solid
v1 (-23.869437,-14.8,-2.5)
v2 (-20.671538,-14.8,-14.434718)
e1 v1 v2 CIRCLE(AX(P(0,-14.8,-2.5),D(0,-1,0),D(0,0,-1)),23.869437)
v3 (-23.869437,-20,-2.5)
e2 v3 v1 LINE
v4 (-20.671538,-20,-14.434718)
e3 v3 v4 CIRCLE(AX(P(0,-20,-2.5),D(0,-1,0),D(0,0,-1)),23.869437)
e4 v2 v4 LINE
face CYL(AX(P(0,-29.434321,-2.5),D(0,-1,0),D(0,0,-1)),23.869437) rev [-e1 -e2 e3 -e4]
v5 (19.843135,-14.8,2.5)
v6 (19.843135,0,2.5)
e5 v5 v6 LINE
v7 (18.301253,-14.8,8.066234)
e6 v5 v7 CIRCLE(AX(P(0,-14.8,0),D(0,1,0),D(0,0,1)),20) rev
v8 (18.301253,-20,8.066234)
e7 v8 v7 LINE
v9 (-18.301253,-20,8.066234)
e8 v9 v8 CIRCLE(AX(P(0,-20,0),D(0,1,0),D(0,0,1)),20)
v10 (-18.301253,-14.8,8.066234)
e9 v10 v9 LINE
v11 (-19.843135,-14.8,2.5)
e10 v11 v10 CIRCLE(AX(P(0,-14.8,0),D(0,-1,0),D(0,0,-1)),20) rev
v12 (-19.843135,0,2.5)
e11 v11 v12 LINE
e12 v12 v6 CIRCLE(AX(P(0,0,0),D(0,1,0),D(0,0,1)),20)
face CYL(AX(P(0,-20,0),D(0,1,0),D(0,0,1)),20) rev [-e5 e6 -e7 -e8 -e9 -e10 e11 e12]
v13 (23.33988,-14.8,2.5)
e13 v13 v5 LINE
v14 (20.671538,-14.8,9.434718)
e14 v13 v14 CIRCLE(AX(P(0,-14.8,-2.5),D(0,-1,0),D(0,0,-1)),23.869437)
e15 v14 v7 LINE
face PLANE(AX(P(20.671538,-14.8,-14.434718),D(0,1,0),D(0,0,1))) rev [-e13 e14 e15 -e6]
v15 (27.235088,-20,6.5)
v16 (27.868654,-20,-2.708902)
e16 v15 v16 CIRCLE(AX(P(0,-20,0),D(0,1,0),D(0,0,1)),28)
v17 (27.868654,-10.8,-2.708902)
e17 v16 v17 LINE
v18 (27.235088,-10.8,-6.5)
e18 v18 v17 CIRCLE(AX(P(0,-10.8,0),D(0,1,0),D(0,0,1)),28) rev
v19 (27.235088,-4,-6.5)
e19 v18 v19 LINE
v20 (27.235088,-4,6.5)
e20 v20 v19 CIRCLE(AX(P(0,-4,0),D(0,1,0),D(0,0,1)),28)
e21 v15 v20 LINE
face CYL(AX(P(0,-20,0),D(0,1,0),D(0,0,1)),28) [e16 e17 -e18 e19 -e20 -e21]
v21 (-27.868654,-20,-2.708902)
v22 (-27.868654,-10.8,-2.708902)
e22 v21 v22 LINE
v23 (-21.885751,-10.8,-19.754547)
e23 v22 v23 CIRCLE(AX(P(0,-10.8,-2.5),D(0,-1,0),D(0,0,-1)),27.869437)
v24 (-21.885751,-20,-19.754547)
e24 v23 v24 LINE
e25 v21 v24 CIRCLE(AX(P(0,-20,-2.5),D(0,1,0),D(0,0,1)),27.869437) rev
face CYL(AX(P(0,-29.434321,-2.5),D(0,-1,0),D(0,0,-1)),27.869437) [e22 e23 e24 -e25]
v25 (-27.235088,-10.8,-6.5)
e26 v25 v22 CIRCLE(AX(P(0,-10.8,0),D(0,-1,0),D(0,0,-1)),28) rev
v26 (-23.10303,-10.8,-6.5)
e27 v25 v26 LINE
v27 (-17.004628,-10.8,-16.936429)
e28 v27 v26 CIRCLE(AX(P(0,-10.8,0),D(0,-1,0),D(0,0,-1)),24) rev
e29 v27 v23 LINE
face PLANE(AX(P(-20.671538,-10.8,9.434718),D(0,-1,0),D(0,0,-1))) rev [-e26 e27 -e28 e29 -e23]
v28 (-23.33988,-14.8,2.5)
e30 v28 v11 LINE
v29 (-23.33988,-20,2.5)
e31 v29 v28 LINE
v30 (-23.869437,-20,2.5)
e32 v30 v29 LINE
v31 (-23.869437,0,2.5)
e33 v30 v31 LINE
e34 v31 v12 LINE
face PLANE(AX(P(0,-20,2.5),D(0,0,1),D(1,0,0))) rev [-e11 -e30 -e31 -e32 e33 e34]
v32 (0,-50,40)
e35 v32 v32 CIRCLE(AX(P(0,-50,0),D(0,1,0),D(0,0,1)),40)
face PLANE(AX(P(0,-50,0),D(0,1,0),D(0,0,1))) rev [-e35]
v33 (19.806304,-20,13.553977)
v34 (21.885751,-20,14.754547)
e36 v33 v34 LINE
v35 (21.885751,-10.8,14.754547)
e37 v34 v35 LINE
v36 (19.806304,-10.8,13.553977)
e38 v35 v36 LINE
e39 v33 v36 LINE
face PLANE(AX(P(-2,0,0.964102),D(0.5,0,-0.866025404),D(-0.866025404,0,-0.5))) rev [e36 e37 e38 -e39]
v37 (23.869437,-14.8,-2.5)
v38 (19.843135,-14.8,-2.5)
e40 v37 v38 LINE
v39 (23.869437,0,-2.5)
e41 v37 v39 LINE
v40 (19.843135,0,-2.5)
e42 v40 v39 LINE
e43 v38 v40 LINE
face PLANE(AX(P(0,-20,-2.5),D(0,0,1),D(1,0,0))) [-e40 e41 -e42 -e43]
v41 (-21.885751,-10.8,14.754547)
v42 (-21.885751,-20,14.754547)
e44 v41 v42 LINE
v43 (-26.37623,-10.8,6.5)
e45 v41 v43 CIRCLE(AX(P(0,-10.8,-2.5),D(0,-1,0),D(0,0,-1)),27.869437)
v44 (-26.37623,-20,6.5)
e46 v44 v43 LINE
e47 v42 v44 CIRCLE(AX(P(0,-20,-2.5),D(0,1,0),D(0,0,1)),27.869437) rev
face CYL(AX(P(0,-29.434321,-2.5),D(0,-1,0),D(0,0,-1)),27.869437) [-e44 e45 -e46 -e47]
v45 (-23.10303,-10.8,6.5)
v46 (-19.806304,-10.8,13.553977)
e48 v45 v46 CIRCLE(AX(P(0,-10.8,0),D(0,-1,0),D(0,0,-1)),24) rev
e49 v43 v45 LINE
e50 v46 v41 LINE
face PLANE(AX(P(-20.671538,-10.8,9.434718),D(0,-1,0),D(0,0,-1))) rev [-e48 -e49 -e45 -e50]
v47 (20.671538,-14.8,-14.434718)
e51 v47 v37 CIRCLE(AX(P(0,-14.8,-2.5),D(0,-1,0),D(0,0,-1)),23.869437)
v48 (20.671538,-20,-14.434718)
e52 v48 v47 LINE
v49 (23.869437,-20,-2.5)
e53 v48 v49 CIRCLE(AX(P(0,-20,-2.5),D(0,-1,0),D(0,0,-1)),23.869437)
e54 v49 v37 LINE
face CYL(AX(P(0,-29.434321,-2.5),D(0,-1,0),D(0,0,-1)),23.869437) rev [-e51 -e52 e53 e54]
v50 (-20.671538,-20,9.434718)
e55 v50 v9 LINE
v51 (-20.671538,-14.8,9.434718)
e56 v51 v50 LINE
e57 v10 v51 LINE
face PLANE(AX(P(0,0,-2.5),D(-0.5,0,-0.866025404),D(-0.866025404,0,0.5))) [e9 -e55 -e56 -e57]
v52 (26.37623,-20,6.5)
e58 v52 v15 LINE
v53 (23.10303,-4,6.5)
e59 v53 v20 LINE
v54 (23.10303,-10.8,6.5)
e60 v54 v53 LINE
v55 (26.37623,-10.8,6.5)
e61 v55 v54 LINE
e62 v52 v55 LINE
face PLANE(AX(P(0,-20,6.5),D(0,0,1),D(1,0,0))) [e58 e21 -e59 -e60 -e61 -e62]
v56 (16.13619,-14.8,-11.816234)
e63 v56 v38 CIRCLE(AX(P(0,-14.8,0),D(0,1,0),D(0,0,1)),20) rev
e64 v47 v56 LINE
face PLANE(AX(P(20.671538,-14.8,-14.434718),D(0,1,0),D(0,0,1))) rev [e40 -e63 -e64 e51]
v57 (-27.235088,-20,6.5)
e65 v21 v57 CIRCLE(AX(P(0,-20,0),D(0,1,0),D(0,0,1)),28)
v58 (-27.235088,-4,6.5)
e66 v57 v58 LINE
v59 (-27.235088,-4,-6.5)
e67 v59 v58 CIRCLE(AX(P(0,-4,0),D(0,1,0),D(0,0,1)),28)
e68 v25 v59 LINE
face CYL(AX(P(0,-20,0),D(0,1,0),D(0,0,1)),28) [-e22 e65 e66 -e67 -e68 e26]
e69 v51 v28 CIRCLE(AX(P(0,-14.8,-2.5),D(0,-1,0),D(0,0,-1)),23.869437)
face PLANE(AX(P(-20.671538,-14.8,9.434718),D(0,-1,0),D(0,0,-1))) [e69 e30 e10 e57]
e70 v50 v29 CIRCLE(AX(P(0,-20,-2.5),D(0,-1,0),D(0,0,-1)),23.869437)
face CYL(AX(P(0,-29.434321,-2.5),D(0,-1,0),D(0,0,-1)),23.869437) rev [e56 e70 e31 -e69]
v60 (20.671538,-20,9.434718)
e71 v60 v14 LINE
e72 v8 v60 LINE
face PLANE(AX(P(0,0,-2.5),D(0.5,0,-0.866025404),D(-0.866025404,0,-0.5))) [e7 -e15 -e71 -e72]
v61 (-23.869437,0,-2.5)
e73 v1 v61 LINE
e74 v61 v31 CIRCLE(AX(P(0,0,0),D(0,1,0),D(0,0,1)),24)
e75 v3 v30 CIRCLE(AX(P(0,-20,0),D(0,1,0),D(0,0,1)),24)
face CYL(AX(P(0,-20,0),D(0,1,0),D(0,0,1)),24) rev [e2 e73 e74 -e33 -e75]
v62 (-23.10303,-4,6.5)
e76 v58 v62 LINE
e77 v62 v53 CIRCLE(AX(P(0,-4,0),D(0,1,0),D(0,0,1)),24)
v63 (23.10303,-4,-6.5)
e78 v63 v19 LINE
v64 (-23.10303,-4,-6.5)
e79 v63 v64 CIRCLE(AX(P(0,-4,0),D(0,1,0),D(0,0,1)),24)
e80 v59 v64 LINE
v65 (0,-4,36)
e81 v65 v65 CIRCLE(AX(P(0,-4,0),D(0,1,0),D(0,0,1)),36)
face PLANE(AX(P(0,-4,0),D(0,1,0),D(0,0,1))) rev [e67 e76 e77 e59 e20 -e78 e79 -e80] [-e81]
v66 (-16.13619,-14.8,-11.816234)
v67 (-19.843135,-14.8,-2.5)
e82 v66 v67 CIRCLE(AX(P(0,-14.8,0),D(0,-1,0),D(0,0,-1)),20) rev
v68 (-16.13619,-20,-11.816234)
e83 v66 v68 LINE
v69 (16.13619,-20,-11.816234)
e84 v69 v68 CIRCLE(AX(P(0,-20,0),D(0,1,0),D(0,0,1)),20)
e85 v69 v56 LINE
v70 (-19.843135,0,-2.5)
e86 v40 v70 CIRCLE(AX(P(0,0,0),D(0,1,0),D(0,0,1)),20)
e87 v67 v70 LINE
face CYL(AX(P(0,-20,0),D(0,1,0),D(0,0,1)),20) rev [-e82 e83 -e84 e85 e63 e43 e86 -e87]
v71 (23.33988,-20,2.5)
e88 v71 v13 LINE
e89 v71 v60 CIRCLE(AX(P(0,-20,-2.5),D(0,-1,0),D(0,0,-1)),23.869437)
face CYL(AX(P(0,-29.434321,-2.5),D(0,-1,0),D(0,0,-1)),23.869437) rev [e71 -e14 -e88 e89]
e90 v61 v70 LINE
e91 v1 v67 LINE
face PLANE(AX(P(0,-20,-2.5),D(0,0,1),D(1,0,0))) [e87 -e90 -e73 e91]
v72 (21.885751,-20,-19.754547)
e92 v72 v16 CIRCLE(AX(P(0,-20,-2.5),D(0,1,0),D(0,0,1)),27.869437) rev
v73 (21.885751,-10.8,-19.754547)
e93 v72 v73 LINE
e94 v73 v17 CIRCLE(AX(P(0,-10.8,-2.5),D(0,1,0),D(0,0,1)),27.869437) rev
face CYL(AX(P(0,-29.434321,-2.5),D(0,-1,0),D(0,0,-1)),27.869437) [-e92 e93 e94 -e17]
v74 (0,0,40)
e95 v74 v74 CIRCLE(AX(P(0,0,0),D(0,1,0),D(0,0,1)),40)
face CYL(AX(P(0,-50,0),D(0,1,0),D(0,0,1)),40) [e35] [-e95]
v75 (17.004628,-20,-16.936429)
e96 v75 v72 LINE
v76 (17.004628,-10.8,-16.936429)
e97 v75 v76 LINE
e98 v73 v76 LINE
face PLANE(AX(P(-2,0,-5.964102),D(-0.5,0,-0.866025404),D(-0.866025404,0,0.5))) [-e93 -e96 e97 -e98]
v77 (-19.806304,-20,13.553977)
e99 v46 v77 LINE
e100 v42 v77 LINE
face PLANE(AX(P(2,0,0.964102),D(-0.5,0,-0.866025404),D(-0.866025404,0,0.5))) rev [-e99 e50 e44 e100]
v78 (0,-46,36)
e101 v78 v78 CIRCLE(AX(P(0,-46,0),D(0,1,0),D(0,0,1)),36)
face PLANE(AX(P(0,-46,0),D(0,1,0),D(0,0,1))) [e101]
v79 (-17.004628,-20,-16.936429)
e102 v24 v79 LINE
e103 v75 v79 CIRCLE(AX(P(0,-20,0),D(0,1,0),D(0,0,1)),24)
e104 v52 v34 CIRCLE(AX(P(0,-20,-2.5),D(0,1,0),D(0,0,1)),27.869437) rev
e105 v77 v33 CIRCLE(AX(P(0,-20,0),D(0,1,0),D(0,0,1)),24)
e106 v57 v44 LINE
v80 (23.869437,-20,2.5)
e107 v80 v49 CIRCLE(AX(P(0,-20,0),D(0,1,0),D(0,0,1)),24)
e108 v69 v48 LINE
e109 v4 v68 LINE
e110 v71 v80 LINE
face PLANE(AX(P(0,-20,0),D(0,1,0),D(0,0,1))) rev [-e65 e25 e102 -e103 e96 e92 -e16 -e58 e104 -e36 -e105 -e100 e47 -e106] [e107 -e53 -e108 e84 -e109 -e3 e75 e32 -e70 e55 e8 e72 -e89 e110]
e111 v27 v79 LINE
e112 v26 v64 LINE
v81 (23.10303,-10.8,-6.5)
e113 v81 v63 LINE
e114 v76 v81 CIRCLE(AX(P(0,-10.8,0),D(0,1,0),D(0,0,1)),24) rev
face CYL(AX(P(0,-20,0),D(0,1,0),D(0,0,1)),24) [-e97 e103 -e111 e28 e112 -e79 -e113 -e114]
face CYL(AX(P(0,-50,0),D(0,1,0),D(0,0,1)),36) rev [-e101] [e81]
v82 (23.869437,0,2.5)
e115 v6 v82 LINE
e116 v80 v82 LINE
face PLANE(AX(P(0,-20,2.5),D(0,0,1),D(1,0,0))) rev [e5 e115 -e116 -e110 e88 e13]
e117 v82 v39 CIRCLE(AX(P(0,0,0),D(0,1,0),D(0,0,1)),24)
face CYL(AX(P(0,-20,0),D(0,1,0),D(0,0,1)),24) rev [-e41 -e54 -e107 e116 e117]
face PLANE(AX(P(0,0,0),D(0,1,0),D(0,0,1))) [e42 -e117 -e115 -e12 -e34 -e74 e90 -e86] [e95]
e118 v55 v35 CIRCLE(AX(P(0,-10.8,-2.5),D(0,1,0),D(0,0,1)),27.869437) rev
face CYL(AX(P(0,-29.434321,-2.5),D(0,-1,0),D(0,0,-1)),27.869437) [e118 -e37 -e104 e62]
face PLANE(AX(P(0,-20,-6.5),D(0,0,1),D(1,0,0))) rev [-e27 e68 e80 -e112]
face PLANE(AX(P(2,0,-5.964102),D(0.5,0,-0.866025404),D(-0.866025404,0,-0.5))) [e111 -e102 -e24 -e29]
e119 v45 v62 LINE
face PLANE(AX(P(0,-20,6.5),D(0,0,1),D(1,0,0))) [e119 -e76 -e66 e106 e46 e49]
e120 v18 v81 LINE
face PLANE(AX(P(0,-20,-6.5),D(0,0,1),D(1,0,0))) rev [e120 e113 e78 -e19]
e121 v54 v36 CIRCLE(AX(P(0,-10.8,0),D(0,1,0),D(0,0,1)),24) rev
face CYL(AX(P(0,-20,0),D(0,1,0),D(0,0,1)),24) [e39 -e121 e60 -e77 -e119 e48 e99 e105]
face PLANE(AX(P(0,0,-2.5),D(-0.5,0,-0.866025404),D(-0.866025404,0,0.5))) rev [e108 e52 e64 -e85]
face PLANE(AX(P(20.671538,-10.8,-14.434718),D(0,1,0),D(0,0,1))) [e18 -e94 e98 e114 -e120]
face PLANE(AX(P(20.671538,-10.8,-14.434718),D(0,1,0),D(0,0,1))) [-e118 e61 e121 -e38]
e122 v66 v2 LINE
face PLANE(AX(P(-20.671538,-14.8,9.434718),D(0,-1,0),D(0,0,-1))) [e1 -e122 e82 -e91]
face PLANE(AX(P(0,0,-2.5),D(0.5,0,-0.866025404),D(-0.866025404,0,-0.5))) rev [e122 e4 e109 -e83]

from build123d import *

# Parameters (mm, degrees)
SKETCH1_R                    = 40
BOSS_EXTRUDE1_DEPTH          = 50
CUT_EXTRUDE1_DEPTH           = 20
SKETCH2_W                    = 5.5
SKETCH2_H                    = 5.2
CUT_REVOLVE1_ANGLE           = 30
CUT_REVOLVE1_OTHER_WAY_ANGLE = 30
SHELL1_START                 = -46
SHELL1_OUTLINE_R             = 36
SHELL1_DEPTH                 = 26
SHELL1_START_2               = -20
SHELL1_2_OUTLINE_R           = 36
SHELL1_2_DEPTH               = 16
SHELL1_START_3               = -10.8
SHELL1_3_DEPTH               = 6.8


# Read off the part's stored shape, not the designer's step: Shell1
with BuildPart() as part:
    # Sketch1 → Boss-Extrude1 (new body)
    with BuildSketch(Plane(origin=(0, 0, 0), x_dir=(1, 0, 0), z_dir=(0, 1, 0))):
        with Locations(Location((0, 0, 0), (0, 0, 270))):
            Circle(SKETCH1_R)
    extrude(amount=-BOSS_EXTRUDE1_DEPTH)

    # Sketch1<3> → Cut-Extrude1 (cut)
    with BuildSketch(Plane(origin=(0, 0, 0), x_dir=(1, 0, 0), z_dir=(0, 1, 0))):
        with BuildLine():
            Line((19.843134833, 2.5), (23.869436525, 2.5))
            ThreePointArc((23.869436525, 2.5), (24, 0), (23.869436525, -2.5))
            Line((23.869436525, -2.5), (19.843134833, -2.5))
            ThreePointArc((19.843134833, -2.5), (0, -20), (-19.843134833, -2.5))
            Line((-19.843134833, -2.5), (-23.869436525, -2.5))
            ThreePointArc((-23.869436525, -2.5), (-24, 0), (-23.869436525, 2.5))
            Line((-23.869436525, 2.5), (-19.843134833, 2.5))
            ThreePointArc((-19.843134833, 2.5), (0, 20), (19.843134833, 2.5))
        make_face()
    extrude(amount=-CUT_EXTRUDE1_DEPTH, mode=Mode.SUBTRACT)

    # Sketch2 → Cut-Revolve1 (revolve, cut)
    with BuildSketch(Plane.XY.offset(-2.5)):
        with Locations((-21.119436525, -17.4)):
            Rectangle(SKETCH2_W, SKETCH2_H)
        with Locations((21.119436525, -17.4)):
            Rectangle(SKETCH2_W, SKETCH2_H)
    revolve(axis=Axis((0, -29.434320881, -2.5), (0, 1, 0)), revolution_arc=CUT_REVOLVE1_ANGLE, mode=Mode.SUBTRACT)

    # Sketch2 → Cut-Revolve1 other way (revolve, cut)
    with BuildSketch(Plane.XY.offset(-2.5)):
        with Locations((-21.119436525, -17.4)):
            Rectangle(SKETCH2_W, SKETCH2_H)
        with Locations((21.119436525, -17.4)):
            Rectangle(SKETCH2_W, SKETCH2_H)
    revolve(axis=Axis((0, -29.434320881, -2.5), (0, -1, 0)), revolution_arc=CUT_REVOLVE1_OTHER_WAY_ANGLE, mode=Mode.SUBTRACT)

    # Shell1 outline → Shell1 (cut)
    with BuildSketch(Plane(origin=(0, 0, 0), x_dir=(1, 0, 0), z_dir=(0, 1, 0)).offset(SHELL1_START)):
        Circle(SHELL1_OUTLINE_R)
    extrude(amount=SHELL1_DEPTH, mode=Mode.SUBTRACT)

    # Shell1 2 outline → Shell1 2 (cut)
    with BuildSketch(Plane(origin=(0, 0, 0), x_dir=(1, 0, 0), z_dir=(0, 1, 0)).offset(SHELL1_START_2)):
        Circle(SHELL1_2_OUTLINE_R)
        with BuildLine():
            Line((-26.376229681, -6.5), (-27.235087663, -6.5))
            ThreePointArc((-27.235087663, -6.5), (-27.933967525, -1.921837216), (-27.86865358, 2.708901561))
            ThreePointArc((-27.86865358, 2.708901561), (-26.29664821, 11.729939607), (-21.885751383, 19.754546606))
            Line((-21.885751383, 19.754546606), (-17.004628173, 16.936428806))
            ThreePointArc((-17.004628173, 16.936428806), (0, 24), (17.004628173, 16.936428806))
            Line((17.004628173, 16.936428806), (21.885751383, 19.754546606))
            ThreePointArc((21.885751383, 19.754546606), (26.29664821, 11.729939607), (27.86865358, 2.708901561))
            ThreePointArc((27.86865358, 2.708901561), (27.933967525, -1.921837216), (27.235087663, -6.5))
            Line((27.235087663, -6.5), (26.376229681, -6.5))
            ThreePointArc((26.376229681, -6.5), (24.481402921, -10.817897852), (21.885751383, -14.754546606))
            Line((21.885751383, -14.754546606), (19.806304482, -13.553977378))
            ThreePointArc((19.806304482, -13.553977378), (0, -24), (-19.806304482, -13.553977378))
            Line((-19.806304482, -13.553977378), (-21.885751383, -14.754546606))
            ThreePointArc((-21.885751383, -14.754546606), (-24.481402921, -10.817897852), (-26.376229681, -6.5))
        make_face(mode=Mode.SUBTRACT)
    extrude(amount=SHELL1_2_DEPTH, mode=Mode.SUBTRACT)

    # Shell1 3 outline → Shell1 3 (cut)
    with BuildSketch(Plane(origin=(0, 0, 0), x_dir=(1, 0, 0), z_dir=(0, 1, 0)).offset(SHELL1_START_3)):
        with BuildLine():
            Line((-23.103030104, -6.5), (-26.376229681, -6.5))
            ThreePointArc((-26.376229681, -6.5), (-24.481402921, -10.817897852), (-21.885751383, -14.754546606))
            Line((-21.885751383, -14.754546606), (-19.806304482, -13.553977378))
            ThreePointArc((-19.806304482, -13.553977378), (-21.742640085, -10.161574786), (-23.103030104, -6.5))
        make_face()
        with BuildLine():
            ThreePointArc((-21.885751383, 19.754546606), (-26.29664821, 11.729939607), (-27.86865358, 2.708901561))
            ThreePointArc((-27.86865358, 2.708901561), (-27.616999866, 4.615335138), (-27.235087663, 6.5))
            Line((-27.235087663, 6.5), (-23.103030104, 6.5))
            ThreePointArc((-23.103030104, 6.5), (-20.721626979, 12.108434057), (-17.004628173, 16.936428806))
            Line((-17.004628173, 16.936428806), (-21.885751383, 19.754546606))
        make_face()
        with BuildLine():
            ThreePointArc((23.103030104, -6.5), (21.742640085, -10.161574786), (19.806304482, -13.553977378))
            Line((19.806304482, -13.553977378), (21.885751383, -14.754546606))
            ThreePointArc((21.885751383, -14.754546606), (24.481402921, -10.817897852), (26.376229681, -6.5))
            Line((26.376229681, -6.5), (23.103030104, -6.5))
        make_face()
        with BuildLine():
            Line((21.885751383, 19.754546606), (17.004628173, 16.936428806))
            ThreePointArc((17.004628173, 16.936428806), (20.721626979, 12.108434057), (23.103030104, 6.5))
            Line((23.103030104, 6.5), (27.235087663, 6.5))
            ThreePointArc((27.235087663, 6.5), (27.616999866, 4.615335138), (27.86865358, 2.708901561))
            ThreePointArc((27.86865358, 2.708901561), (26.29664821, 11.729939607), (21.885751383, 19.754546606))
        make_face()
    extrude(amount=SHELL1_3_DEPTH, mode=Mode.SUBTRACT)


solid = part.part
